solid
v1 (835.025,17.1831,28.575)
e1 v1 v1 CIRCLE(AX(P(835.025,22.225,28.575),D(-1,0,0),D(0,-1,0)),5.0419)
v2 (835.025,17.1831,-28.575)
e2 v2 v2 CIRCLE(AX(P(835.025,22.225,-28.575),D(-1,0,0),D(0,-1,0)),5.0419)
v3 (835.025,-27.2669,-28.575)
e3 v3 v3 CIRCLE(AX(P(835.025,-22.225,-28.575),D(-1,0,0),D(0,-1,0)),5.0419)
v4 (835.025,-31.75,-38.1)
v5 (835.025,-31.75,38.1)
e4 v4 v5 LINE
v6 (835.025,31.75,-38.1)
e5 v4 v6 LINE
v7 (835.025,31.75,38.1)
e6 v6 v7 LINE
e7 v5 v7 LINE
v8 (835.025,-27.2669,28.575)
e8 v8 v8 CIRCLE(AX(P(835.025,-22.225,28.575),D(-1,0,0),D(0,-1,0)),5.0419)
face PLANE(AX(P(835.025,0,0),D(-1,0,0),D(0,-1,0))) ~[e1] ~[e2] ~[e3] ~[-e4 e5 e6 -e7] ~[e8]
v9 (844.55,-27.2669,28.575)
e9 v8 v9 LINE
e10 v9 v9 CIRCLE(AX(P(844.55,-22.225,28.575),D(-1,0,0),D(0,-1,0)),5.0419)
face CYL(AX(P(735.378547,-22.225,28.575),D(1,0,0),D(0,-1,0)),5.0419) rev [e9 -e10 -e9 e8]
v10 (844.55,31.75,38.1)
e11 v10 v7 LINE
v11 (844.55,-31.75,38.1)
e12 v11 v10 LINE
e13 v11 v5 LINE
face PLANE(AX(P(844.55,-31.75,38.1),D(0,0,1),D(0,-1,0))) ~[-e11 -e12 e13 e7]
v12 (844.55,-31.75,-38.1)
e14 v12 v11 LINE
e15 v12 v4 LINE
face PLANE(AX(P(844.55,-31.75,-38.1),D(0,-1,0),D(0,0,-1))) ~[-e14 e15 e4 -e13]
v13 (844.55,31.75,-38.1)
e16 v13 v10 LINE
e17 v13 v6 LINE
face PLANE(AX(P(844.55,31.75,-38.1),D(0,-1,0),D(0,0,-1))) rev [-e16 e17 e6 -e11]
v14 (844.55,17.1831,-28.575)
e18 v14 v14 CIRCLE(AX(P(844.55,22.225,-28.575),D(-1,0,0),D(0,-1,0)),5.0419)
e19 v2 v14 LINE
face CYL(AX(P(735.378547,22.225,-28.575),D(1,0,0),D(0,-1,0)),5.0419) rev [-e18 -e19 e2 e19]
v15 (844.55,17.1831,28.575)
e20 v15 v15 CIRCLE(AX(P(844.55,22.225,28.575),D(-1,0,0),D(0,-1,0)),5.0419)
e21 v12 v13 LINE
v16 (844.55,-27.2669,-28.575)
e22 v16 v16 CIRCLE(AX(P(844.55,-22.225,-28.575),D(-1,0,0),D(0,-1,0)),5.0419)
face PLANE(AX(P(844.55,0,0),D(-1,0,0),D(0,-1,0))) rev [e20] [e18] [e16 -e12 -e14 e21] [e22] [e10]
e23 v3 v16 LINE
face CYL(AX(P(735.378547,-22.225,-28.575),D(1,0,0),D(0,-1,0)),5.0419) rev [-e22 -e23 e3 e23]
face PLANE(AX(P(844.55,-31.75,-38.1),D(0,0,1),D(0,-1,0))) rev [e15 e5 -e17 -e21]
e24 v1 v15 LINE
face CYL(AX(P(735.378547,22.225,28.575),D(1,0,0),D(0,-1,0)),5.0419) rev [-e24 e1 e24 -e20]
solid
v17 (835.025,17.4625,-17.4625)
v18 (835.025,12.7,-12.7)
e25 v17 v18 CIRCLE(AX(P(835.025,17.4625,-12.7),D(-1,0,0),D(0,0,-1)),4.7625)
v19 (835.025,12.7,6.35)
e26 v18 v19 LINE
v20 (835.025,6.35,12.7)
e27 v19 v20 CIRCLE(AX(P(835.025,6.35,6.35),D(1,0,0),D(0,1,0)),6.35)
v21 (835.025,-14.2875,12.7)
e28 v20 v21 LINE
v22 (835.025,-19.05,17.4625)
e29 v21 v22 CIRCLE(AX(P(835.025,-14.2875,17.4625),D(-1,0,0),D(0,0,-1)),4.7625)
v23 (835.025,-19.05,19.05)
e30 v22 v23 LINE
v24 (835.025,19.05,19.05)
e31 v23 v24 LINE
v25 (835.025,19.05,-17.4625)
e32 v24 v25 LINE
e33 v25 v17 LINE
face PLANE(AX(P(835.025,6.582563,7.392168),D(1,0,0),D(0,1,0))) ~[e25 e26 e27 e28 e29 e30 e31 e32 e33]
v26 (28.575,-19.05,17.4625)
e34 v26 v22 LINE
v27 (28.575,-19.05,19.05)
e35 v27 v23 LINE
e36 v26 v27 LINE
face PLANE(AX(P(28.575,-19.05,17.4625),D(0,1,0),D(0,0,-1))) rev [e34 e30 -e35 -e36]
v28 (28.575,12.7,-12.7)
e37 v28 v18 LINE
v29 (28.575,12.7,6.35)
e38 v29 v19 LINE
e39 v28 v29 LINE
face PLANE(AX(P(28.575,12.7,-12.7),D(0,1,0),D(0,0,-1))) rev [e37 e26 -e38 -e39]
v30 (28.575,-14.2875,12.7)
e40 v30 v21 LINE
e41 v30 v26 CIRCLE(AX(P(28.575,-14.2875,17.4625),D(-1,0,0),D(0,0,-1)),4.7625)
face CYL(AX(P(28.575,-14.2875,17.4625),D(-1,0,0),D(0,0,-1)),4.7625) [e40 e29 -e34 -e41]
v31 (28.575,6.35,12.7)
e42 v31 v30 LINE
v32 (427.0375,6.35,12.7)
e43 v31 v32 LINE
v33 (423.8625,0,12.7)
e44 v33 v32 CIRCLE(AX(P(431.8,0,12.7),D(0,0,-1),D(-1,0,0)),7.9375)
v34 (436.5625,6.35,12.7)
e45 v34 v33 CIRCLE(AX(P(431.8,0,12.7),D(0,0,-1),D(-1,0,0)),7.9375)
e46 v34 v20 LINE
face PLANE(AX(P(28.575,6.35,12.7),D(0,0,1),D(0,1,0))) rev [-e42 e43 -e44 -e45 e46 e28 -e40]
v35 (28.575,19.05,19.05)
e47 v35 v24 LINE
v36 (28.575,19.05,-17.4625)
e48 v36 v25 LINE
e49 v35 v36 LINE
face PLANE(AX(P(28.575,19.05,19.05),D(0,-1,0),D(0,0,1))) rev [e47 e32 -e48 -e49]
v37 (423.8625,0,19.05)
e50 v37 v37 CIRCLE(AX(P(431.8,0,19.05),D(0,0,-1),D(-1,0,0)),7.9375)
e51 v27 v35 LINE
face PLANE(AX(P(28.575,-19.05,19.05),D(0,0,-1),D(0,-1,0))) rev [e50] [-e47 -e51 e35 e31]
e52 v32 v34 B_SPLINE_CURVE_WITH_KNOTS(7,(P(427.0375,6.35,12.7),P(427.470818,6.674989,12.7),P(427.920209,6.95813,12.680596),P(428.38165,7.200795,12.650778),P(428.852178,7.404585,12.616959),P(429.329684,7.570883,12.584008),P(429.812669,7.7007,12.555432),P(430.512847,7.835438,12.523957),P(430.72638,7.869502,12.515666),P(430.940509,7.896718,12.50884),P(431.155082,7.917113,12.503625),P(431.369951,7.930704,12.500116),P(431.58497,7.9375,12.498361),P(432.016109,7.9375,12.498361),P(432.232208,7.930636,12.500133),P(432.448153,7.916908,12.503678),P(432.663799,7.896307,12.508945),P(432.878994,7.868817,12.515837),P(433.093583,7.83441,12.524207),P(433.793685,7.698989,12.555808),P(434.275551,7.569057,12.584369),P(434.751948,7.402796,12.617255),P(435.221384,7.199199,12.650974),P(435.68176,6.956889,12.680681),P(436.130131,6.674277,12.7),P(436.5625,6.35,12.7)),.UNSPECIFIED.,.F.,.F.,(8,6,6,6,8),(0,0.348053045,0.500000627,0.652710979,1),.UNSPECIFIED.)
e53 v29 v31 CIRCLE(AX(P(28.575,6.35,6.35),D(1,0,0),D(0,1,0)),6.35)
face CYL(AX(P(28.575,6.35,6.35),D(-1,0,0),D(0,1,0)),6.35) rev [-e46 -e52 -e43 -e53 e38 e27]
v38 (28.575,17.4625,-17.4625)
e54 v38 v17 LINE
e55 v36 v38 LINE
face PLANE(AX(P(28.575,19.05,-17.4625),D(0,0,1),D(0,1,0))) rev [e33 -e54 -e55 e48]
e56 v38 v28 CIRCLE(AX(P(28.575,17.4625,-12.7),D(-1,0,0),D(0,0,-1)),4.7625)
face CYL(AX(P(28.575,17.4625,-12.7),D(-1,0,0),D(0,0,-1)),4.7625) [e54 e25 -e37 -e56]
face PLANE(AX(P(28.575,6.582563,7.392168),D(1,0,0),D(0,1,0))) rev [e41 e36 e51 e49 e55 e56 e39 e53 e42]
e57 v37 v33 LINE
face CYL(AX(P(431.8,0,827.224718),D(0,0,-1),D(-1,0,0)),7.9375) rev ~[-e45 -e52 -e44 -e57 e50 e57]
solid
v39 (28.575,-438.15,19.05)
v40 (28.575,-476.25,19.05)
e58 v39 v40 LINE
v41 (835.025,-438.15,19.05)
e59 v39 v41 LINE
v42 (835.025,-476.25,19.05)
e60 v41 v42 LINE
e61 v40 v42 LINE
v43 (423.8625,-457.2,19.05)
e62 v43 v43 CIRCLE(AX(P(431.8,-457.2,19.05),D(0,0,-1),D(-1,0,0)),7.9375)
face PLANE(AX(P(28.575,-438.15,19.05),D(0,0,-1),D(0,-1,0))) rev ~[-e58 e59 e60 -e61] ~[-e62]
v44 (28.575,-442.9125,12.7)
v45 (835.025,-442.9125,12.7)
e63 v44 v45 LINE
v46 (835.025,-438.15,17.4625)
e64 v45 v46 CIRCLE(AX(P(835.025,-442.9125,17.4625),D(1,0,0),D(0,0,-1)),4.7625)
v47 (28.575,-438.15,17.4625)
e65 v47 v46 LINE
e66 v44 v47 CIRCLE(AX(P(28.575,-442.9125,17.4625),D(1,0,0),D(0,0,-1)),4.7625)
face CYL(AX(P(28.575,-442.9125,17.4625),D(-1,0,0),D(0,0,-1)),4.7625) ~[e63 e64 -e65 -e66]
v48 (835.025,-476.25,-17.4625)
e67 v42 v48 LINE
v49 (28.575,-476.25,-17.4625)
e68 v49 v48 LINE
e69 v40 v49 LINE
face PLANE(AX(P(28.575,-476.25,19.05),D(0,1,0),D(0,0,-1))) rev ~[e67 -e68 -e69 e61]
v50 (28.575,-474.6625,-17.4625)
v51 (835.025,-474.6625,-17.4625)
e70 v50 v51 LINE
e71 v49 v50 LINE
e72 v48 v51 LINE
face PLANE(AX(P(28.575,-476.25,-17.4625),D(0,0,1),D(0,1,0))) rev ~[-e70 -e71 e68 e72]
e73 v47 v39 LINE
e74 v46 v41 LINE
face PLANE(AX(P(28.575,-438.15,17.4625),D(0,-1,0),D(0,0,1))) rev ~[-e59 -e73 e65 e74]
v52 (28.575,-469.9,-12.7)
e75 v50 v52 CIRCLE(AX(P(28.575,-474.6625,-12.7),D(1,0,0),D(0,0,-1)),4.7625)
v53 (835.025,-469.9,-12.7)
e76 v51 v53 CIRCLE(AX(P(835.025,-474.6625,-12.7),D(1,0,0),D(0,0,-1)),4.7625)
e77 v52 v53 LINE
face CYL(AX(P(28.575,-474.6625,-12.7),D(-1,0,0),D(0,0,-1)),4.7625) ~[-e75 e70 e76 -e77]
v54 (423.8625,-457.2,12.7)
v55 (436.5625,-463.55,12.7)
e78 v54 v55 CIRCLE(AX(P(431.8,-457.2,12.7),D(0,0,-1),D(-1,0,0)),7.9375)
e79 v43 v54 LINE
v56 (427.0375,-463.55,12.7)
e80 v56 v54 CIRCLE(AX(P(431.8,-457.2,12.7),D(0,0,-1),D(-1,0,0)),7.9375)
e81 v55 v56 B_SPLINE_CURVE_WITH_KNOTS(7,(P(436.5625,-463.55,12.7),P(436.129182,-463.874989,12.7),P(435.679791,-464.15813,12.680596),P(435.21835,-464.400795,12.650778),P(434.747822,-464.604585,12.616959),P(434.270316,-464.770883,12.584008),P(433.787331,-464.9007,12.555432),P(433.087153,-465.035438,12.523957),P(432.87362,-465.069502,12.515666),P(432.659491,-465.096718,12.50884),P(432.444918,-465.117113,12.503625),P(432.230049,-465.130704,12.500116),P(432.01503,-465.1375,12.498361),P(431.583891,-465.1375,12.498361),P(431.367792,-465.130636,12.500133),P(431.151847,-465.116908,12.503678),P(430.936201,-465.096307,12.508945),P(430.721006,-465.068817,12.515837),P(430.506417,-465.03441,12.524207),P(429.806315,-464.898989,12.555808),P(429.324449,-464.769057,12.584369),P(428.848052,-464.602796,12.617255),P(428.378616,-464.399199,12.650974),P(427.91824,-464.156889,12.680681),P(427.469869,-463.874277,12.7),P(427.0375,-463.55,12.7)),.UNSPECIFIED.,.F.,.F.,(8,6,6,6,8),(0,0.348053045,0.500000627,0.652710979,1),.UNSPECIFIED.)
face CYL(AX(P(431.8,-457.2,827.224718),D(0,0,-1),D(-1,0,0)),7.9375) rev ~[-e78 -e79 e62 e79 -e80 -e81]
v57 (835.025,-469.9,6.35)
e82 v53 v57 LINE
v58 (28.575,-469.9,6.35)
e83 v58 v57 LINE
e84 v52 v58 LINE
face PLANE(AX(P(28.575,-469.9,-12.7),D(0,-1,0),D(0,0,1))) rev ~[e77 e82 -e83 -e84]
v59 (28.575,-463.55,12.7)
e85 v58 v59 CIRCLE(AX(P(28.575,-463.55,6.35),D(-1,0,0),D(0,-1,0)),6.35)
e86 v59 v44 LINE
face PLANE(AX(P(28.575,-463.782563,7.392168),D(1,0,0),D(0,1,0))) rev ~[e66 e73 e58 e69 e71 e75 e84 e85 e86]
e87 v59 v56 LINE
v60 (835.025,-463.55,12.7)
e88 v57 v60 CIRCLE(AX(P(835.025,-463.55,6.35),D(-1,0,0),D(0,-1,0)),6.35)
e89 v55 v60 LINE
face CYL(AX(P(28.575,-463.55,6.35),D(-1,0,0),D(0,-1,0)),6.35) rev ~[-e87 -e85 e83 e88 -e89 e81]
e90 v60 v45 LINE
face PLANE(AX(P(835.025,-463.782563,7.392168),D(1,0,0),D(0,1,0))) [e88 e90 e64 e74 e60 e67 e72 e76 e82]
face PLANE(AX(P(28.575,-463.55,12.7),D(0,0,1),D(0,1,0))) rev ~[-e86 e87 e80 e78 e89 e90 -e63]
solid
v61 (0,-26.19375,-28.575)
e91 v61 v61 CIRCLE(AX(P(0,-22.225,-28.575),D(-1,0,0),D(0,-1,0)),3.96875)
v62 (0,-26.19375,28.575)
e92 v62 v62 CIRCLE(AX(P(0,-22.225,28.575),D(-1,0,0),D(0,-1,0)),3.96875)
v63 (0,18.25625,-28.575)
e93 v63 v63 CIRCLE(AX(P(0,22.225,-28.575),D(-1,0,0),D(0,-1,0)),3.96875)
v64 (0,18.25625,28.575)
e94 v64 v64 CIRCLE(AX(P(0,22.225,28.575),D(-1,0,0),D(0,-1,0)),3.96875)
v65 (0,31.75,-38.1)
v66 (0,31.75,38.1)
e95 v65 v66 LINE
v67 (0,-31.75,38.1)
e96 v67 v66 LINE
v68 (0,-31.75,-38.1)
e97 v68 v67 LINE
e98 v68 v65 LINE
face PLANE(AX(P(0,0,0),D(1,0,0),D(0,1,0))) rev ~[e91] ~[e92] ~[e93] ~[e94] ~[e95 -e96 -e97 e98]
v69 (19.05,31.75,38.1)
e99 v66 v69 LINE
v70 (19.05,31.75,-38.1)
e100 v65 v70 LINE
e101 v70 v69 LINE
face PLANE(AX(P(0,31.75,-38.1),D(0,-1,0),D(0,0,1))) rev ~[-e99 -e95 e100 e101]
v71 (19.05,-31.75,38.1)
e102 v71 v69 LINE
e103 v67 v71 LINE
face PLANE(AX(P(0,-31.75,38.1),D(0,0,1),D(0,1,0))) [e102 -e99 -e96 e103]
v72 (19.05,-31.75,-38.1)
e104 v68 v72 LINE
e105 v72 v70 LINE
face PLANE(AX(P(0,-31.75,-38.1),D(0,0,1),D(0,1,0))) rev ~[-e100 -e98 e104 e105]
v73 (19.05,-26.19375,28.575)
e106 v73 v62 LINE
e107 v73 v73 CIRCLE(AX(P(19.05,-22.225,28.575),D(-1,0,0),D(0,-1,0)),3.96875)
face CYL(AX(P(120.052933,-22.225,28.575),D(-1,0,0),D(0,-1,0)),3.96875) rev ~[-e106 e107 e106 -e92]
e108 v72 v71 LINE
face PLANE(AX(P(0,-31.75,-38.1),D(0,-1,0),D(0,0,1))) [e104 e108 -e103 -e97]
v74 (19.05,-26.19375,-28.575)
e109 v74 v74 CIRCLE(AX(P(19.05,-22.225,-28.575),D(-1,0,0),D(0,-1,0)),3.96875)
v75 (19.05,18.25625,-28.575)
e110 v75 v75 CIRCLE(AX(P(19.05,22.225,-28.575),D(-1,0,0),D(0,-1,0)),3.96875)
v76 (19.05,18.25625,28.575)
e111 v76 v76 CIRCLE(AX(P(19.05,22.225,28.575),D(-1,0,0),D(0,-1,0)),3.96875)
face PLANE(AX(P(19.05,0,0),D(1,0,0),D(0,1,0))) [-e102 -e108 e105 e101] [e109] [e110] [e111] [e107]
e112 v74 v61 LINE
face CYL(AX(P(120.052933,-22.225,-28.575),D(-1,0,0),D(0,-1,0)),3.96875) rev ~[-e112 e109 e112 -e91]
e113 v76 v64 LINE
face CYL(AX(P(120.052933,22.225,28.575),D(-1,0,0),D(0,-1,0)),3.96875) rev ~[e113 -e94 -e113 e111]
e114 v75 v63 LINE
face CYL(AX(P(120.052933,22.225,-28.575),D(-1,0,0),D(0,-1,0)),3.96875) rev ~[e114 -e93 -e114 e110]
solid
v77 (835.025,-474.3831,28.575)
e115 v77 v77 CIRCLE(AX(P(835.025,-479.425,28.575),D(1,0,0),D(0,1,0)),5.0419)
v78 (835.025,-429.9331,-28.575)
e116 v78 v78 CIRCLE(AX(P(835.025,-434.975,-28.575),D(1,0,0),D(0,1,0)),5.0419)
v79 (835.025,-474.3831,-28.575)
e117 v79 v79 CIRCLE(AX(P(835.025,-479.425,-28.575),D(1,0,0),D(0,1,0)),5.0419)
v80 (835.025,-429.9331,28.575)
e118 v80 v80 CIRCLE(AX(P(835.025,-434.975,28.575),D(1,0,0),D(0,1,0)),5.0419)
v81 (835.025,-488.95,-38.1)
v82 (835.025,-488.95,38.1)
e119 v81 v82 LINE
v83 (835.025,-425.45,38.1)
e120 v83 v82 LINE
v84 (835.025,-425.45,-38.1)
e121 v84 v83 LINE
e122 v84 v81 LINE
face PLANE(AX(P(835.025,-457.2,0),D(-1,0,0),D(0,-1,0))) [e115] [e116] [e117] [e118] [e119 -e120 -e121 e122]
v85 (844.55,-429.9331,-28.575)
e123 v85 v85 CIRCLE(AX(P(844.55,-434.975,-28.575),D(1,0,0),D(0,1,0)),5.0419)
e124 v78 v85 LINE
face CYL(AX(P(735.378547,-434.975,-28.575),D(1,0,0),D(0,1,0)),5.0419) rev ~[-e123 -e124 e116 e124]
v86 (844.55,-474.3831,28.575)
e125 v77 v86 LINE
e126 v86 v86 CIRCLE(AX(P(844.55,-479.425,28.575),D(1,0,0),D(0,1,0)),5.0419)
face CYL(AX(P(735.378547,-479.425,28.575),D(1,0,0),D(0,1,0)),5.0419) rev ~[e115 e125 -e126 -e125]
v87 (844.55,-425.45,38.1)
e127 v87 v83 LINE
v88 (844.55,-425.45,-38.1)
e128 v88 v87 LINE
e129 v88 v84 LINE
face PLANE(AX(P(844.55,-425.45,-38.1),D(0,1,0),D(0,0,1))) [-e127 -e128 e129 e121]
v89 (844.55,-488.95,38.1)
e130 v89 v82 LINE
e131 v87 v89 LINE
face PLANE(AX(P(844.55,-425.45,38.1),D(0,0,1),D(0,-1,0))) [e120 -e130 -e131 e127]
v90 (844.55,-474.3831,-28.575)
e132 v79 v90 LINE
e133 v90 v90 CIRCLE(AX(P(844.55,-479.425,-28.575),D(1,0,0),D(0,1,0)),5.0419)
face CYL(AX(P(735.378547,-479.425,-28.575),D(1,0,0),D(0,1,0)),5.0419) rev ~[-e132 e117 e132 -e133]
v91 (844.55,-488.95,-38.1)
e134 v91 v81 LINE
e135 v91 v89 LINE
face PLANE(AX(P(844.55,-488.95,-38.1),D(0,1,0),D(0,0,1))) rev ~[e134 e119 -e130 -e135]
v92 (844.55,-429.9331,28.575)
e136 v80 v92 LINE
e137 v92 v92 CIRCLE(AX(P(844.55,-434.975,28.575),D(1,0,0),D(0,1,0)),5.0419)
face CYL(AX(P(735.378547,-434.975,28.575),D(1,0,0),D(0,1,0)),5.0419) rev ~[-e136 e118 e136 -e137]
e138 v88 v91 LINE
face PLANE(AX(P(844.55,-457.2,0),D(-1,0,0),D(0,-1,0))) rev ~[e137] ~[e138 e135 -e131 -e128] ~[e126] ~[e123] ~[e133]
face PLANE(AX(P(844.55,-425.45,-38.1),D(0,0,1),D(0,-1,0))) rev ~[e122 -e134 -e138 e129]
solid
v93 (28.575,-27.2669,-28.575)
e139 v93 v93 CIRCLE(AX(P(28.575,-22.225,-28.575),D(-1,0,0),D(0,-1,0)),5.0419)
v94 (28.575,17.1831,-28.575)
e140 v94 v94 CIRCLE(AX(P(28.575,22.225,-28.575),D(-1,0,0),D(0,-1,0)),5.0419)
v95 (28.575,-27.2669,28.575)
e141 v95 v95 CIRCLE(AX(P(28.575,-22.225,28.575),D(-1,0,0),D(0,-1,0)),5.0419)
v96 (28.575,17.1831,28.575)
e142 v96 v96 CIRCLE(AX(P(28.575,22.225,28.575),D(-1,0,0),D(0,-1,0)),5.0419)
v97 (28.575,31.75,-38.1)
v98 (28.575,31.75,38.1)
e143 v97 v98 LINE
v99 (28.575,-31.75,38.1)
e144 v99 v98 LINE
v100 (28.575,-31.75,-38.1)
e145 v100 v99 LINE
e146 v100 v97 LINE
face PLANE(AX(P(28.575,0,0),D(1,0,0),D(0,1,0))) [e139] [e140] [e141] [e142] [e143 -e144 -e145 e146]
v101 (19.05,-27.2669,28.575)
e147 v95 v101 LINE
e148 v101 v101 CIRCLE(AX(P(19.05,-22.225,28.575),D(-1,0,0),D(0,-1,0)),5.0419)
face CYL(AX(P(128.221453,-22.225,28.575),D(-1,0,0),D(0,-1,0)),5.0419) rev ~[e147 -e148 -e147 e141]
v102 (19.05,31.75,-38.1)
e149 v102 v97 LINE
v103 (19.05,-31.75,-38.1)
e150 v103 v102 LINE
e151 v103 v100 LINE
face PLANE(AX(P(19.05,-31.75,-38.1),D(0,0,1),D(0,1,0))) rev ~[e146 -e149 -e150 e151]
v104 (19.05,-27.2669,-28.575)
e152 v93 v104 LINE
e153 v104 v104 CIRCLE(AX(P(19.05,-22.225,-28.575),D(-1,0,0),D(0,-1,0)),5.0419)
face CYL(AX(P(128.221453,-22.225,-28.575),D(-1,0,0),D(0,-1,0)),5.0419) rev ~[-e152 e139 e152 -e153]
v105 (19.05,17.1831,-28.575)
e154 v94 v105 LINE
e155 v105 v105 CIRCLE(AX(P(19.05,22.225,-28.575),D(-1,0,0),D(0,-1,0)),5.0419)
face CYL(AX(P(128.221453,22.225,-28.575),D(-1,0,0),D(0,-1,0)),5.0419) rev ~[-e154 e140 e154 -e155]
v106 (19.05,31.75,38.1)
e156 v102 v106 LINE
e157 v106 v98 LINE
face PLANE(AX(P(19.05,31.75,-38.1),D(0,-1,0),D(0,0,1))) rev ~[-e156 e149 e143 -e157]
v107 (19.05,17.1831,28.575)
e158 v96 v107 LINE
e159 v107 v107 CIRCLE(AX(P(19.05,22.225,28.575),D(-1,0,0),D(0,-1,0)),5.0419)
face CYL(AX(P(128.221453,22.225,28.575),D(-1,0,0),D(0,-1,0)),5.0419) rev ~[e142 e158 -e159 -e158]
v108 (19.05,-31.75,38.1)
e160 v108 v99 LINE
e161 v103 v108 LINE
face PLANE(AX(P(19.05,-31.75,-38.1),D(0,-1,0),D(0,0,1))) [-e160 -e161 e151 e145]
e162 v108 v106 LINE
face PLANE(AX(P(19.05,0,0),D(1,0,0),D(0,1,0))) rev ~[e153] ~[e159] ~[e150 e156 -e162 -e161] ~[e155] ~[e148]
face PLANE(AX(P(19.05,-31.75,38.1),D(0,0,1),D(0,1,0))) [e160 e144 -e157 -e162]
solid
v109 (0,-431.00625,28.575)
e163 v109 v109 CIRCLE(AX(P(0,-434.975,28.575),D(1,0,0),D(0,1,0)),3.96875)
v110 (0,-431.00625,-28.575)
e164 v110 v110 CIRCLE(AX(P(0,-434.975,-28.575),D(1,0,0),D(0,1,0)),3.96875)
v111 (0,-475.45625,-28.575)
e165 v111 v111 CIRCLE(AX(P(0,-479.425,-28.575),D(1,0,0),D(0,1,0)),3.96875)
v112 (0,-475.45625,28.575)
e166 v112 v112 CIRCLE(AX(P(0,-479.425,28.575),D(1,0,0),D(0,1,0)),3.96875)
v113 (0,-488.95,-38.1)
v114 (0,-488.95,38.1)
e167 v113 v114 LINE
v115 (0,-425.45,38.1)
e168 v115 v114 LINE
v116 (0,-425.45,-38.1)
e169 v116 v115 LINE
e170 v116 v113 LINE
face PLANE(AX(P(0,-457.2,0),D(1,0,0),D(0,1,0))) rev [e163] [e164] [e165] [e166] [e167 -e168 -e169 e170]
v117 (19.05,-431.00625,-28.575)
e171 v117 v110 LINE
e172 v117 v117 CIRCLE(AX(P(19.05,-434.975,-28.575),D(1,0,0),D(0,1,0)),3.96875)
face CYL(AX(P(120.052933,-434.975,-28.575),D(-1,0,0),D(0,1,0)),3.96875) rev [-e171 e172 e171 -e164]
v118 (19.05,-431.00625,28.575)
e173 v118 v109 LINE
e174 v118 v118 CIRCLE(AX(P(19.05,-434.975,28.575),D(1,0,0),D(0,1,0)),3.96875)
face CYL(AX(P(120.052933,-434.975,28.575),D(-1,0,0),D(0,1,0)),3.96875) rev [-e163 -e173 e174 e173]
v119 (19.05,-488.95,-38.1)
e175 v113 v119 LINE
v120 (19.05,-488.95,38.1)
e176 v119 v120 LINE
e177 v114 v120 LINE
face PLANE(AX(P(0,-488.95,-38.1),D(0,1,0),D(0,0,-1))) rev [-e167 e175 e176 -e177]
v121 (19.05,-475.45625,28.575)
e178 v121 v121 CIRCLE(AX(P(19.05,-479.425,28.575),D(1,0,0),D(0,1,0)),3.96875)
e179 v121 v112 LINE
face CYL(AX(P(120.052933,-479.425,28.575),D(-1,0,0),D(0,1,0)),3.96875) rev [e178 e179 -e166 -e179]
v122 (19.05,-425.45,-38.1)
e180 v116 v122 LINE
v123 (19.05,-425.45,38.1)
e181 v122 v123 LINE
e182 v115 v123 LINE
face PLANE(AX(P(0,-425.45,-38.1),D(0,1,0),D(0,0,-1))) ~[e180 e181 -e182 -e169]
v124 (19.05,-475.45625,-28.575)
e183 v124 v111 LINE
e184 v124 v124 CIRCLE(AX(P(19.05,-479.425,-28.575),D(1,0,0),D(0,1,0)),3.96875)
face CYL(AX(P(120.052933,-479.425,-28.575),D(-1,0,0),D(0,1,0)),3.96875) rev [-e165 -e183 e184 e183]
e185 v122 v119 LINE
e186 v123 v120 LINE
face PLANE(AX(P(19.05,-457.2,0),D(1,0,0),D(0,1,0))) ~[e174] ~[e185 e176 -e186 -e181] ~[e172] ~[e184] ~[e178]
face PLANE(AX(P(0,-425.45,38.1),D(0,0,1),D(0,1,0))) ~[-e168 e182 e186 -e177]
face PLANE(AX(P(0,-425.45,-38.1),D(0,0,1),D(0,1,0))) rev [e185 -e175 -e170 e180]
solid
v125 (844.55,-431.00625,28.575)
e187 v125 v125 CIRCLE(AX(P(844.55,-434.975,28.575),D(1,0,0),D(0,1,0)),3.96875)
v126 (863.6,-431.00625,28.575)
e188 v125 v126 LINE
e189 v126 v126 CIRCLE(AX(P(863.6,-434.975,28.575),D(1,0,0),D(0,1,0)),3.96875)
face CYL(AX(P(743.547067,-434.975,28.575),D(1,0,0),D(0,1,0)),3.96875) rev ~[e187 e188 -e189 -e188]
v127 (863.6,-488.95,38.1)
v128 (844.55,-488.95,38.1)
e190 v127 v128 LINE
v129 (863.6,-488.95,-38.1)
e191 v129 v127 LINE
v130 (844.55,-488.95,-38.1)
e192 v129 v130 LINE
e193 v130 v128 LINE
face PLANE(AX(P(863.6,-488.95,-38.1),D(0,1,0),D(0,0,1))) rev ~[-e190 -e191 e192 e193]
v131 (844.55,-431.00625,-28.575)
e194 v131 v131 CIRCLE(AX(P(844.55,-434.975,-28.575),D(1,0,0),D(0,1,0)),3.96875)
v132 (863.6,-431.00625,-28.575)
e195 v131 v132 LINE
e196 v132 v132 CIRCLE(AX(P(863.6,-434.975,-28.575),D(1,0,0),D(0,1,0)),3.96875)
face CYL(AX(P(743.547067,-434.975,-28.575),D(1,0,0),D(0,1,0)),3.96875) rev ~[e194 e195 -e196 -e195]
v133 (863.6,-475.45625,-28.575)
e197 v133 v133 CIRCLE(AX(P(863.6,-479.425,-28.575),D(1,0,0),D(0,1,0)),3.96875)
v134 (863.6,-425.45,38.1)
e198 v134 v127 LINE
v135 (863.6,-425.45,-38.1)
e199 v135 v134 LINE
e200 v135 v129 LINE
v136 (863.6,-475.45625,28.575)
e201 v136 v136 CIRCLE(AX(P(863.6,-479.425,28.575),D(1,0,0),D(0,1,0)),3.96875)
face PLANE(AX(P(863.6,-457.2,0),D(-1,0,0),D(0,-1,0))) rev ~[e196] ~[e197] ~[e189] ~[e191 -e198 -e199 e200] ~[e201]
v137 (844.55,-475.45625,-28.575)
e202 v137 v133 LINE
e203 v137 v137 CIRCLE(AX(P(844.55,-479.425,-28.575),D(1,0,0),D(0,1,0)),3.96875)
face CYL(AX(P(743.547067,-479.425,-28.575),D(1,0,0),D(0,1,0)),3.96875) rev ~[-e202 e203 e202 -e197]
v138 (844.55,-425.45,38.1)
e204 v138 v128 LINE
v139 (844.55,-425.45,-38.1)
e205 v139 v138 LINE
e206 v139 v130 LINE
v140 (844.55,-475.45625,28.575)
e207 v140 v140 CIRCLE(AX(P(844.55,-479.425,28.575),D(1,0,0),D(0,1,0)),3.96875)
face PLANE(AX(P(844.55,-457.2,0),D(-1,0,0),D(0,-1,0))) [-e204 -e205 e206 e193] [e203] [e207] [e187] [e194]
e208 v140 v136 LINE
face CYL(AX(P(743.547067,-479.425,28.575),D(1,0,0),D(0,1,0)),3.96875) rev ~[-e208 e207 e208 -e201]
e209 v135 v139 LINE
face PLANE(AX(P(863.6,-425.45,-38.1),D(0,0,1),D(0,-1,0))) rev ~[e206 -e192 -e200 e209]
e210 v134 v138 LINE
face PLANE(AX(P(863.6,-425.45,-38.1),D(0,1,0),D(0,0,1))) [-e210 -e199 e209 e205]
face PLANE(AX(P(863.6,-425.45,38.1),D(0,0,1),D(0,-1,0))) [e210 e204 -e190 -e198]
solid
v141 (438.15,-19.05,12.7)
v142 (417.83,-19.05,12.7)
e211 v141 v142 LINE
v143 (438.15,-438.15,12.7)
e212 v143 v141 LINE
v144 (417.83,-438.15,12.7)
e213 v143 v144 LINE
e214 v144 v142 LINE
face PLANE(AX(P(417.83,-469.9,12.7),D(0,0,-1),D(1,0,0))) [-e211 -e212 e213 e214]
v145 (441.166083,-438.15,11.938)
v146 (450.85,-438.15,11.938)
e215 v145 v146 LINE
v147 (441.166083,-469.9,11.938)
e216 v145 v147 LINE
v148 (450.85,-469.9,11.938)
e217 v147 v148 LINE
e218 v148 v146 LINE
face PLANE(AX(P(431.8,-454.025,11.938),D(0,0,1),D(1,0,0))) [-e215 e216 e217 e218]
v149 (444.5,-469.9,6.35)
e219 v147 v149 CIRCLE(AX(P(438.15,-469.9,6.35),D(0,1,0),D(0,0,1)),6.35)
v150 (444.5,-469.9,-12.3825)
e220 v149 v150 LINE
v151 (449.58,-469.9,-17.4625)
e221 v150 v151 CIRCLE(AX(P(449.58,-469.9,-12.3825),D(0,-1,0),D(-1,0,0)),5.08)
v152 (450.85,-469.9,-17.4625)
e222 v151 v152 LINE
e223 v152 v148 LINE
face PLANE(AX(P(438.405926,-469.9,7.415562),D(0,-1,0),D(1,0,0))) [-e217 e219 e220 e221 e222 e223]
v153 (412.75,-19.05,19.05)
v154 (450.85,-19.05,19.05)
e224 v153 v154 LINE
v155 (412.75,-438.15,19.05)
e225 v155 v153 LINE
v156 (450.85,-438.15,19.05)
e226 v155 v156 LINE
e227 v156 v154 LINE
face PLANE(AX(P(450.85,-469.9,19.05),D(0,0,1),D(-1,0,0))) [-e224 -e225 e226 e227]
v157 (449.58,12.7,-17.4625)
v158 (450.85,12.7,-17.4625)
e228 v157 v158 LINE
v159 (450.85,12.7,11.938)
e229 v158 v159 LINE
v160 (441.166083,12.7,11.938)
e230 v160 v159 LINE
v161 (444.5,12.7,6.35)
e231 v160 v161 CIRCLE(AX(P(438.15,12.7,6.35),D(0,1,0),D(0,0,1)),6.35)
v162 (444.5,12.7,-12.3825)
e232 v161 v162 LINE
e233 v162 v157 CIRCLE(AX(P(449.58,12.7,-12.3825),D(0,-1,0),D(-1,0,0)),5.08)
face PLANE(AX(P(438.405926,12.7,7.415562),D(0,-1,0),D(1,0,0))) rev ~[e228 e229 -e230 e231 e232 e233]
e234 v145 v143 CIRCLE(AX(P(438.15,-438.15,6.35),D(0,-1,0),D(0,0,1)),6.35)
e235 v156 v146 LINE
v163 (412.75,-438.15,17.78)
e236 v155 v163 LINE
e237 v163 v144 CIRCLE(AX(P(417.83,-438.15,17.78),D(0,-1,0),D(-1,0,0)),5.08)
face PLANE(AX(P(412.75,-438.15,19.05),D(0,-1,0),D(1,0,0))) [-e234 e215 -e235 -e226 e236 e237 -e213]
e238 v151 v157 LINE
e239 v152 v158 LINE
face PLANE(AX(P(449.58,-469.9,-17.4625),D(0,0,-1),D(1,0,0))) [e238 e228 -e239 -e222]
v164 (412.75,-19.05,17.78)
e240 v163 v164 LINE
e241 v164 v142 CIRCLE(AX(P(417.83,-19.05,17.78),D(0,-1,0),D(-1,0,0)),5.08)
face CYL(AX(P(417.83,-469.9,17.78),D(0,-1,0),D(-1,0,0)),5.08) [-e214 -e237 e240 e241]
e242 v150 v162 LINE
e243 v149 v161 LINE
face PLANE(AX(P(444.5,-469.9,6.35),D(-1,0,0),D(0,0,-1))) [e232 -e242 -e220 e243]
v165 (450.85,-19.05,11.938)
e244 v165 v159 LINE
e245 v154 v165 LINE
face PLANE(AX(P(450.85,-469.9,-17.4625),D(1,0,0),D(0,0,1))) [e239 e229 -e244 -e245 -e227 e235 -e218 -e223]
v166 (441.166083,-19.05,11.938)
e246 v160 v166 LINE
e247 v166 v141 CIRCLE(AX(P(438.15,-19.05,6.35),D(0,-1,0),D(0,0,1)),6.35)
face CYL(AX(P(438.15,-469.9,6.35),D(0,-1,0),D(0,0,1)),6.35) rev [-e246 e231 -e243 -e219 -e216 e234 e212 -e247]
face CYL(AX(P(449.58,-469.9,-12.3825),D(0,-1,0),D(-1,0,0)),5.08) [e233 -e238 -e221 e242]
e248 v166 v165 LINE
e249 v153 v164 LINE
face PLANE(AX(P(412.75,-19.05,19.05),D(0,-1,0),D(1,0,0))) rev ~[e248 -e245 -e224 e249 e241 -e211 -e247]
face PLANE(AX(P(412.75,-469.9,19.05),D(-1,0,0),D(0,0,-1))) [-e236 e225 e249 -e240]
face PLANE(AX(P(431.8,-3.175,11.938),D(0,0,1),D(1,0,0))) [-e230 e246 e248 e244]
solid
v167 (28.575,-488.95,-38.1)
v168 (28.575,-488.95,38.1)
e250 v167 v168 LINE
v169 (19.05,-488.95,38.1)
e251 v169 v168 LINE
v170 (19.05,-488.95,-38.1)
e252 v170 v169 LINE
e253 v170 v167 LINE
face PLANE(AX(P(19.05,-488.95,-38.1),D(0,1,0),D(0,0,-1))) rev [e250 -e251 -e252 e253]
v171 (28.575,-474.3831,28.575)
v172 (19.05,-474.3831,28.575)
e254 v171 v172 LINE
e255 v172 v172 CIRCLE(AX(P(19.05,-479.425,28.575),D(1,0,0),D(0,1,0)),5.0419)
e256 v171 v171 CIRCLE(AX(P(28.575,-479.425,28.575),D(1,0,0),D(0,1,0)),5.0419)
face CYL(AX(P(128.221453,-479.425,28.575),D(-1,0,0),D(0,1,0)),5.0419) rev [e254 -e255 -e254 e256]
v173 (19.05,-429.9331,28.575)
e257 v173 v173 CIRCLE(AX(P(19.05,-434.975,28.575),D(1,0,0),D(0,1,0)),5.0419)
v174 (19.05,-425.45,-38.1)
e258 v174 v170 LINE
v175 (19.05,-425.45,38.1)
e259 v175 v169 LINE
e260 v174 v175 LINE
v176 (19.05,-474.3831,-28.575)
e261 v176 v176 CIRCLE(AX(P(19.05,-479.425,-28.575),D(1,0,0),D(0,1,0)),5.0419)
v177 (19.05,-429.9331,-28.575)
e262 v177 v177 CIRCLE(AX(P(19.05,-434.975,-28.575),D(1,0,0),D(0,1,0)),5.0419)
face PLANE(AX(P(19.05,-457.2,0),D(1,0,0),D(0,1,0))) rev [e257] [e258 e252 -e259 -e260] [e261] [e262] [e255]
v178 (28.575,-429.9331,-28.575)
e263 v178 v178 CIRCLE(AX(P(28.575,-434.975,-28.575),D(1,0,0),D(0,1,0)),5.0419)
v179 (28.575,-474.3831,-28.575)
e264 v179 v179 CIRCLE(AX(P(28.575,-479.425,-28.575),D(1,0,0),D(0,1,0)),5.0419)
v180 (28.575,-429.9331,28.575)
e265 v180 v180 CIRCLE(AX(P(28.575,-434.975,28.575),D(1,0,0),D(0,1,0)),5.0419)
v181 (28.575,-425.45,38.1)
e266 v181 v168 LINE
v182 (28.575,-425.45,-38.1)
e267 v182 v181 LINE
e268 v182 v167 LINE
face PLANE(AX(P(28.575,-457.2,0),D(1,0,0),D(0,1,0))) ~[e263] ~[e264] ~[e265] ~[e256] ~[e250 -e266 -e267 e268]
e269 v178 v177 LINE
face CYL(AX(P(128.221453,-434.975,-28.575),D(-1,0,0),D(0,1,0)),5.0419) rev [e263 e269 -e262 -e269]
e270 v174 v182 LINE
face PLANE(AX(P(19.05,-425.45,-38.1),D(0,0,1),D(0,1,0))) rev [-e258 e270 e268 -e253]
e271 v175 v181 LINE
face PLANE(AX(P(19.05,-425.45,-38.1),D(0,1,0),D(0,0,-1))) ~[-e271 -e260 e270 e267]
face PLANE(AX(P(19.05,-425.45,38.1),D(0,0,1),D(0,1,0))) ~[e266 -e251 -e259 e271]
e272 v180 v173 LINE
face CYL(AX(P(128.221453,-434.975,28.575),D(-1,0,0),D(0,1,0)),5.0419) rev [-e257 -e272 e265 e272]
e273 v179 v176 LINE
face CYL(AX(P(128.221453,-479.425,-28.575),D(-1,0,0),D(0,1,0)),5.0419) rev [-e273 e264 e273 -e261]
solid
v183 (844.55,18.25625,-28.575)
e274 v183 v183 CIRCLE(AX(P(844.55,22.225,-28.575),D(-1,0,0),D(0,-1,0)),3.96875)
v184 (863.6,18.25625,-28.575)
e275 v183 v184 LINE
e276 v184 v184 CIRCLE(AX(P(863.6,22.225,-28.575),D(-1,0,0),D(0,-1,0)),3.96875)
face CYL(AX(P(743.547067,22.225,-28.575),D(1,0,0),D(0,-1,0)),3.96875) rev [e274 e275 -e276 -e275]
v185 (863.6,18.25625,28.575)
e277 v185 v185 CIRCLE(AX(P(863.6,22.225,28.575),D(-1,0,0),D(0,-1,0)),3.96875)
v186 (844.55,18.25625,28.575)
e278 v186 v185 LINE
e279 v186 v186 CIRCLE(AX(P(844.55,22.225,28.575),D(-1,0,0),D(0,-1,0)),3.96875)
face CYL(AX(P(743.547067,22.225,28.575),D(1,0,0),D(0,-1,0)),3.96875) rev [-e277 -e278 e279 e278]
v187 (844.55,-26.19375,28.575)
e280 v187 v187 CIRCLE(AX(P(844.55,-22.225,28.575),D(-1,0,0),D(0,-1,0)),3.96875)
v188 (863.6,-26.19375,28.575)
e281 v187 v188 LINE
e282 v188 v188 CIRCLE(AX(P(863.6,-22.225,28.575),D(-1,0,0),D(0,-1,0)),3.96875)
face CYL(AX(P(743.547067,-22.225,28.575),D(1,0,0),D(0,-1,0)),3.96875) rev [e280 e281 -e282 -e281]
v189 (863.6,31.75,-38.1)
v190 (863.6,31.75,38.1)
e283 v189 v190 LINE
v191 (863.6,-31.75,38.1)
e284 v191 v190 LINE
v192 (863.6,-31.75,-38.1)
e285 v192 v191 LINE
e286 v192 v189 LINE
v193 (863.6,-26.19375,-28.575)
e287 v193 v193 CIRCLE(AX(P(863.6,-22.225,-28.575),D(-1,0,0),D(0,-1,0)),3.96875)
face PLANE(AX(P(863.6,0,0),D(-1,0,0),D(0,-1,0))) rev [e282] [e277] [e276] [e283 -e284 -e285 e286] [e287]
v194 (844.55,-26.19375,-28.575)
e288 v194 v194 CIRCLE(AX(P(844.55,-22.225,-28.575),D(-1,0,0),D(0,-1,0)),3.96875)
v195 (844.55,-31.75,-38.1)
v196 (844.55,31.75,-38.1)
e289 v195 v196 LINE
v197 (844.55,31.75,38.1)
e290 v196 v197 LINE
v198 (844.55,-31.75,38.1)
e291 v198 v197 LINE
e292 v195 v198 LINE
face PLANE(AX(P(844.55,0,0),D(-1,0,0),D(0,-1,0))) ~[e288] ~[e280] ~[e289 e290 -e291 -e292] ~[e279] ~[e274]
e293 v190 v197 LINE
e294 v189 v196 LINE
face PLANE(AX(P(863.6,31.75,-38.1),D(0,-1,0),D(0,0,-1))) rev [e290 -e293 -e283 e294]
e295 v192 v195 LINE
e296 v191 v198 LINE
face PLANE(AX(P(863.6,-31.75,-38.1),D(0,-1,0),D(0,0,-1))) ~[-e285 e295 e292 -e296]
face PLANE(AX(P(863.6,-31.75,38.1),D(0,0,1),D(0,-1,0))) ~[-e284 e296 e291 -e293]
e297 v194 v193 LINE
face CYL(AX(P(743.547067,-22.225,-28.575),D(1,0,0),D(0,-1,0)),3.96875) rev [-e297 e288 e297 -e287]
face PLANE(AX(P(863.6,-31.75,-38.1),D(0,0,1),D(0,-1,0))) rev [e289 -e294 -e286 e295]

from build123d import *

# Parameters (mm, degrees)
F0_W      = 63.5
F0_H      = 76.2
F1_DEPTH  = 19.05
F4_D      = 7.9375
F8_W      = 63.5
F8_H      = 76.2
F9_DEPTH  = 9.525
F11_D     = 10.0838
F15_DEPTH = 806.45
F19_DEPTH = 482.6
F20_W     = 38.1
F20_H     = 31.75
F21_DEPTH = 7.112
F23_D     = 15.875
F23_2_D   = 15.875


# Not quite as in the source:
# - a length typed as a fraction of an inch, garbled in the dataset ("3 / 203.2 mm" for 3/8 in), is restored


with BuildPart() as f1:
    # F0 (on Right) → F1 (new body)
    with BuildSketch(Plane.YZ):
        Rectangle(F0_W, F0_H)
    extrude(amount=F1_DEPTH)

    # F4 (through all)
    with Locations(Plane.YZ.offset(19.05)):
        with Locations((-22.225, 28.575), (22.225, 28.575), (-22.225, -28.575), (22.225, -28.575)):
            Hole(F4_D / 2)


with BuildPart() as f5_1:
    # F5: instance of F1
    add(f1.part.mirror(Plane(origin=(431.8, 0, 0), x_dir=(0, 1, 0), z_dir=(-1, 0, 0))))


with BuildPart() as f7_1:
    # F7: instance of F1
    add(f1.part.mirror(Plane.XZ.offset(228.6)))


with BuildPart() as f7_2:
    # F7: instance of F5_1
    add(f5_1.part.mirror(Plane.XZ.offset(228.6)))


with BuildPart() as f9:
    # F8 (on face) → F9 (new body)
    with BuildSketch(Plane.YZ.offset(19.05)):
        Rectangle(F8_W, F8_H)
    extrude(amount=F9_DEPTH)

    # F11 (through all)
    with Locations(Plane.YZ.offset(28.575)):
        with Locations((22.225, 28.575), (-22.225, 28.575), (22.225, -28.575), (-22.225, -28.575)):
            Hole(F11_D / 2)


with BuildPart() as f12_1:
    # F12: instance of F9
    add(f9.part.mirror(Plane(origin=(431.8, 0, 0), x_dir=(0, 1, 0), z_dir=(-1, 0, 0))))


with BuildPart() as f13_1:
    # F13: instance of F9
    add(f9.part.mirror(Plane.XZ.offset(228.6)))


with BuildPart() as f13_2:
    # F13: instance of F12_1
    add(f12_1.part.mirror(Plane.XZ.offset(228.6)))


with BuildPart() as f15:
    # F14 (on face) → F15 (new body)
    with BuildSketch(Plane.YZ.offset(28.575)):
        with BuildLine():
            Line((-438.15, 19.05), (-476.25, 19.05))
            Line((-476.25, 19.05), (-476.25, -17.4625))
            Line((-476.25, -17.4625), (-474.6625, -17.4625))
            ThreePointArc((-474.6625, -17.4625), (-471.2949039546, -16.0675960454), (-469.9, -12.7))
            Line((-469.9, -12.7), (-469.9, 6.35))
            ThreePointArc((-469.9, 6.35), (-468.0401280605, 10.8401280605), (-463.55, 12.7))
            Line((-463.55, 12.7), (-442.9125, 12.7))
            ThreePointArc((-442.9125, 12.7), (-439.5449039546, 14.0949039546), (-438.15, 17.4625))
            Line((-438.15, 17.4625), (-438.15, 19.05))
        make_face()
    extrude(amount=F15_DEPTH)


with BuildPart() as f16_1:
    # F16: instance of F15
    add(f15.part.mirror(Plane.XZ.offset(228.6)))

    # F23#2 (through all)
    with Locations(Plane.XY.offset(19.05)):
        with Locations((431.8, -457.2), (431.8, 0)):
            Hole(F23_2_D / 2)


with BuildPart() as f19:
    # F18 (on offset) → F19 (new body)
    with BuildSketch(Plane.XZ.offset(469.9)):
        with BuildLine():
            Line((449.58, -17.4625), (450.85, -17.4625))
            Line((450.85, -17.4625), (450.85, 19.05))
            Line((450.85, 19.05), (412.75, 19.05))
            Line((412.75, 19.05), (412.75, 17.78))
            ThreePointArc((412.75, 17.78), (414.2378975516, 14.1878975516), (417.83, 12.7))
            Line((417.83, 12.7), (438.15, 12.7))
            ThreePointArc((438.15, 12.7), (442.6401280605, 10.8401280605), (444.5, 6.35))
            Line((444.5, 6.35), (444.5, -12.3825))
            ThreePointArc((444.5, -12.3825), (445.9878975516, -15.9746024484), (449.58, -17.4625))
        make_face()
    extrude(amount=-F19_DEPTH)

    # F20 (on face) → F21 (cut)
    with BuildSketch(Plane.XY.offset(19.05)):
        with Locations((431.8, -454.025)):
            Rectangle(F20_W, F20_H)
        with Locations((431.8, -3.175)):
            Rectangle(F20_W, F20_H)
    extrude(amount=-F21_DEPTH, mode=Mode.SUBTRACT)


with BuildPart() as f15_1:
    add(f15.part)

    # F23 (through all)
    with Locations(Plane.XY.offset(19.05)):
        with Locations((431.8, -457.2), (431.8, 0)):
            Hole(F23_D / 2)


solid = Compound([f1.part, f5_1.part, f7_1.part, f7_2.part, f9.part, f12_1.part, f13_1.part, f13_2.part, f16_1.part, f19.part, f15_1.part])
